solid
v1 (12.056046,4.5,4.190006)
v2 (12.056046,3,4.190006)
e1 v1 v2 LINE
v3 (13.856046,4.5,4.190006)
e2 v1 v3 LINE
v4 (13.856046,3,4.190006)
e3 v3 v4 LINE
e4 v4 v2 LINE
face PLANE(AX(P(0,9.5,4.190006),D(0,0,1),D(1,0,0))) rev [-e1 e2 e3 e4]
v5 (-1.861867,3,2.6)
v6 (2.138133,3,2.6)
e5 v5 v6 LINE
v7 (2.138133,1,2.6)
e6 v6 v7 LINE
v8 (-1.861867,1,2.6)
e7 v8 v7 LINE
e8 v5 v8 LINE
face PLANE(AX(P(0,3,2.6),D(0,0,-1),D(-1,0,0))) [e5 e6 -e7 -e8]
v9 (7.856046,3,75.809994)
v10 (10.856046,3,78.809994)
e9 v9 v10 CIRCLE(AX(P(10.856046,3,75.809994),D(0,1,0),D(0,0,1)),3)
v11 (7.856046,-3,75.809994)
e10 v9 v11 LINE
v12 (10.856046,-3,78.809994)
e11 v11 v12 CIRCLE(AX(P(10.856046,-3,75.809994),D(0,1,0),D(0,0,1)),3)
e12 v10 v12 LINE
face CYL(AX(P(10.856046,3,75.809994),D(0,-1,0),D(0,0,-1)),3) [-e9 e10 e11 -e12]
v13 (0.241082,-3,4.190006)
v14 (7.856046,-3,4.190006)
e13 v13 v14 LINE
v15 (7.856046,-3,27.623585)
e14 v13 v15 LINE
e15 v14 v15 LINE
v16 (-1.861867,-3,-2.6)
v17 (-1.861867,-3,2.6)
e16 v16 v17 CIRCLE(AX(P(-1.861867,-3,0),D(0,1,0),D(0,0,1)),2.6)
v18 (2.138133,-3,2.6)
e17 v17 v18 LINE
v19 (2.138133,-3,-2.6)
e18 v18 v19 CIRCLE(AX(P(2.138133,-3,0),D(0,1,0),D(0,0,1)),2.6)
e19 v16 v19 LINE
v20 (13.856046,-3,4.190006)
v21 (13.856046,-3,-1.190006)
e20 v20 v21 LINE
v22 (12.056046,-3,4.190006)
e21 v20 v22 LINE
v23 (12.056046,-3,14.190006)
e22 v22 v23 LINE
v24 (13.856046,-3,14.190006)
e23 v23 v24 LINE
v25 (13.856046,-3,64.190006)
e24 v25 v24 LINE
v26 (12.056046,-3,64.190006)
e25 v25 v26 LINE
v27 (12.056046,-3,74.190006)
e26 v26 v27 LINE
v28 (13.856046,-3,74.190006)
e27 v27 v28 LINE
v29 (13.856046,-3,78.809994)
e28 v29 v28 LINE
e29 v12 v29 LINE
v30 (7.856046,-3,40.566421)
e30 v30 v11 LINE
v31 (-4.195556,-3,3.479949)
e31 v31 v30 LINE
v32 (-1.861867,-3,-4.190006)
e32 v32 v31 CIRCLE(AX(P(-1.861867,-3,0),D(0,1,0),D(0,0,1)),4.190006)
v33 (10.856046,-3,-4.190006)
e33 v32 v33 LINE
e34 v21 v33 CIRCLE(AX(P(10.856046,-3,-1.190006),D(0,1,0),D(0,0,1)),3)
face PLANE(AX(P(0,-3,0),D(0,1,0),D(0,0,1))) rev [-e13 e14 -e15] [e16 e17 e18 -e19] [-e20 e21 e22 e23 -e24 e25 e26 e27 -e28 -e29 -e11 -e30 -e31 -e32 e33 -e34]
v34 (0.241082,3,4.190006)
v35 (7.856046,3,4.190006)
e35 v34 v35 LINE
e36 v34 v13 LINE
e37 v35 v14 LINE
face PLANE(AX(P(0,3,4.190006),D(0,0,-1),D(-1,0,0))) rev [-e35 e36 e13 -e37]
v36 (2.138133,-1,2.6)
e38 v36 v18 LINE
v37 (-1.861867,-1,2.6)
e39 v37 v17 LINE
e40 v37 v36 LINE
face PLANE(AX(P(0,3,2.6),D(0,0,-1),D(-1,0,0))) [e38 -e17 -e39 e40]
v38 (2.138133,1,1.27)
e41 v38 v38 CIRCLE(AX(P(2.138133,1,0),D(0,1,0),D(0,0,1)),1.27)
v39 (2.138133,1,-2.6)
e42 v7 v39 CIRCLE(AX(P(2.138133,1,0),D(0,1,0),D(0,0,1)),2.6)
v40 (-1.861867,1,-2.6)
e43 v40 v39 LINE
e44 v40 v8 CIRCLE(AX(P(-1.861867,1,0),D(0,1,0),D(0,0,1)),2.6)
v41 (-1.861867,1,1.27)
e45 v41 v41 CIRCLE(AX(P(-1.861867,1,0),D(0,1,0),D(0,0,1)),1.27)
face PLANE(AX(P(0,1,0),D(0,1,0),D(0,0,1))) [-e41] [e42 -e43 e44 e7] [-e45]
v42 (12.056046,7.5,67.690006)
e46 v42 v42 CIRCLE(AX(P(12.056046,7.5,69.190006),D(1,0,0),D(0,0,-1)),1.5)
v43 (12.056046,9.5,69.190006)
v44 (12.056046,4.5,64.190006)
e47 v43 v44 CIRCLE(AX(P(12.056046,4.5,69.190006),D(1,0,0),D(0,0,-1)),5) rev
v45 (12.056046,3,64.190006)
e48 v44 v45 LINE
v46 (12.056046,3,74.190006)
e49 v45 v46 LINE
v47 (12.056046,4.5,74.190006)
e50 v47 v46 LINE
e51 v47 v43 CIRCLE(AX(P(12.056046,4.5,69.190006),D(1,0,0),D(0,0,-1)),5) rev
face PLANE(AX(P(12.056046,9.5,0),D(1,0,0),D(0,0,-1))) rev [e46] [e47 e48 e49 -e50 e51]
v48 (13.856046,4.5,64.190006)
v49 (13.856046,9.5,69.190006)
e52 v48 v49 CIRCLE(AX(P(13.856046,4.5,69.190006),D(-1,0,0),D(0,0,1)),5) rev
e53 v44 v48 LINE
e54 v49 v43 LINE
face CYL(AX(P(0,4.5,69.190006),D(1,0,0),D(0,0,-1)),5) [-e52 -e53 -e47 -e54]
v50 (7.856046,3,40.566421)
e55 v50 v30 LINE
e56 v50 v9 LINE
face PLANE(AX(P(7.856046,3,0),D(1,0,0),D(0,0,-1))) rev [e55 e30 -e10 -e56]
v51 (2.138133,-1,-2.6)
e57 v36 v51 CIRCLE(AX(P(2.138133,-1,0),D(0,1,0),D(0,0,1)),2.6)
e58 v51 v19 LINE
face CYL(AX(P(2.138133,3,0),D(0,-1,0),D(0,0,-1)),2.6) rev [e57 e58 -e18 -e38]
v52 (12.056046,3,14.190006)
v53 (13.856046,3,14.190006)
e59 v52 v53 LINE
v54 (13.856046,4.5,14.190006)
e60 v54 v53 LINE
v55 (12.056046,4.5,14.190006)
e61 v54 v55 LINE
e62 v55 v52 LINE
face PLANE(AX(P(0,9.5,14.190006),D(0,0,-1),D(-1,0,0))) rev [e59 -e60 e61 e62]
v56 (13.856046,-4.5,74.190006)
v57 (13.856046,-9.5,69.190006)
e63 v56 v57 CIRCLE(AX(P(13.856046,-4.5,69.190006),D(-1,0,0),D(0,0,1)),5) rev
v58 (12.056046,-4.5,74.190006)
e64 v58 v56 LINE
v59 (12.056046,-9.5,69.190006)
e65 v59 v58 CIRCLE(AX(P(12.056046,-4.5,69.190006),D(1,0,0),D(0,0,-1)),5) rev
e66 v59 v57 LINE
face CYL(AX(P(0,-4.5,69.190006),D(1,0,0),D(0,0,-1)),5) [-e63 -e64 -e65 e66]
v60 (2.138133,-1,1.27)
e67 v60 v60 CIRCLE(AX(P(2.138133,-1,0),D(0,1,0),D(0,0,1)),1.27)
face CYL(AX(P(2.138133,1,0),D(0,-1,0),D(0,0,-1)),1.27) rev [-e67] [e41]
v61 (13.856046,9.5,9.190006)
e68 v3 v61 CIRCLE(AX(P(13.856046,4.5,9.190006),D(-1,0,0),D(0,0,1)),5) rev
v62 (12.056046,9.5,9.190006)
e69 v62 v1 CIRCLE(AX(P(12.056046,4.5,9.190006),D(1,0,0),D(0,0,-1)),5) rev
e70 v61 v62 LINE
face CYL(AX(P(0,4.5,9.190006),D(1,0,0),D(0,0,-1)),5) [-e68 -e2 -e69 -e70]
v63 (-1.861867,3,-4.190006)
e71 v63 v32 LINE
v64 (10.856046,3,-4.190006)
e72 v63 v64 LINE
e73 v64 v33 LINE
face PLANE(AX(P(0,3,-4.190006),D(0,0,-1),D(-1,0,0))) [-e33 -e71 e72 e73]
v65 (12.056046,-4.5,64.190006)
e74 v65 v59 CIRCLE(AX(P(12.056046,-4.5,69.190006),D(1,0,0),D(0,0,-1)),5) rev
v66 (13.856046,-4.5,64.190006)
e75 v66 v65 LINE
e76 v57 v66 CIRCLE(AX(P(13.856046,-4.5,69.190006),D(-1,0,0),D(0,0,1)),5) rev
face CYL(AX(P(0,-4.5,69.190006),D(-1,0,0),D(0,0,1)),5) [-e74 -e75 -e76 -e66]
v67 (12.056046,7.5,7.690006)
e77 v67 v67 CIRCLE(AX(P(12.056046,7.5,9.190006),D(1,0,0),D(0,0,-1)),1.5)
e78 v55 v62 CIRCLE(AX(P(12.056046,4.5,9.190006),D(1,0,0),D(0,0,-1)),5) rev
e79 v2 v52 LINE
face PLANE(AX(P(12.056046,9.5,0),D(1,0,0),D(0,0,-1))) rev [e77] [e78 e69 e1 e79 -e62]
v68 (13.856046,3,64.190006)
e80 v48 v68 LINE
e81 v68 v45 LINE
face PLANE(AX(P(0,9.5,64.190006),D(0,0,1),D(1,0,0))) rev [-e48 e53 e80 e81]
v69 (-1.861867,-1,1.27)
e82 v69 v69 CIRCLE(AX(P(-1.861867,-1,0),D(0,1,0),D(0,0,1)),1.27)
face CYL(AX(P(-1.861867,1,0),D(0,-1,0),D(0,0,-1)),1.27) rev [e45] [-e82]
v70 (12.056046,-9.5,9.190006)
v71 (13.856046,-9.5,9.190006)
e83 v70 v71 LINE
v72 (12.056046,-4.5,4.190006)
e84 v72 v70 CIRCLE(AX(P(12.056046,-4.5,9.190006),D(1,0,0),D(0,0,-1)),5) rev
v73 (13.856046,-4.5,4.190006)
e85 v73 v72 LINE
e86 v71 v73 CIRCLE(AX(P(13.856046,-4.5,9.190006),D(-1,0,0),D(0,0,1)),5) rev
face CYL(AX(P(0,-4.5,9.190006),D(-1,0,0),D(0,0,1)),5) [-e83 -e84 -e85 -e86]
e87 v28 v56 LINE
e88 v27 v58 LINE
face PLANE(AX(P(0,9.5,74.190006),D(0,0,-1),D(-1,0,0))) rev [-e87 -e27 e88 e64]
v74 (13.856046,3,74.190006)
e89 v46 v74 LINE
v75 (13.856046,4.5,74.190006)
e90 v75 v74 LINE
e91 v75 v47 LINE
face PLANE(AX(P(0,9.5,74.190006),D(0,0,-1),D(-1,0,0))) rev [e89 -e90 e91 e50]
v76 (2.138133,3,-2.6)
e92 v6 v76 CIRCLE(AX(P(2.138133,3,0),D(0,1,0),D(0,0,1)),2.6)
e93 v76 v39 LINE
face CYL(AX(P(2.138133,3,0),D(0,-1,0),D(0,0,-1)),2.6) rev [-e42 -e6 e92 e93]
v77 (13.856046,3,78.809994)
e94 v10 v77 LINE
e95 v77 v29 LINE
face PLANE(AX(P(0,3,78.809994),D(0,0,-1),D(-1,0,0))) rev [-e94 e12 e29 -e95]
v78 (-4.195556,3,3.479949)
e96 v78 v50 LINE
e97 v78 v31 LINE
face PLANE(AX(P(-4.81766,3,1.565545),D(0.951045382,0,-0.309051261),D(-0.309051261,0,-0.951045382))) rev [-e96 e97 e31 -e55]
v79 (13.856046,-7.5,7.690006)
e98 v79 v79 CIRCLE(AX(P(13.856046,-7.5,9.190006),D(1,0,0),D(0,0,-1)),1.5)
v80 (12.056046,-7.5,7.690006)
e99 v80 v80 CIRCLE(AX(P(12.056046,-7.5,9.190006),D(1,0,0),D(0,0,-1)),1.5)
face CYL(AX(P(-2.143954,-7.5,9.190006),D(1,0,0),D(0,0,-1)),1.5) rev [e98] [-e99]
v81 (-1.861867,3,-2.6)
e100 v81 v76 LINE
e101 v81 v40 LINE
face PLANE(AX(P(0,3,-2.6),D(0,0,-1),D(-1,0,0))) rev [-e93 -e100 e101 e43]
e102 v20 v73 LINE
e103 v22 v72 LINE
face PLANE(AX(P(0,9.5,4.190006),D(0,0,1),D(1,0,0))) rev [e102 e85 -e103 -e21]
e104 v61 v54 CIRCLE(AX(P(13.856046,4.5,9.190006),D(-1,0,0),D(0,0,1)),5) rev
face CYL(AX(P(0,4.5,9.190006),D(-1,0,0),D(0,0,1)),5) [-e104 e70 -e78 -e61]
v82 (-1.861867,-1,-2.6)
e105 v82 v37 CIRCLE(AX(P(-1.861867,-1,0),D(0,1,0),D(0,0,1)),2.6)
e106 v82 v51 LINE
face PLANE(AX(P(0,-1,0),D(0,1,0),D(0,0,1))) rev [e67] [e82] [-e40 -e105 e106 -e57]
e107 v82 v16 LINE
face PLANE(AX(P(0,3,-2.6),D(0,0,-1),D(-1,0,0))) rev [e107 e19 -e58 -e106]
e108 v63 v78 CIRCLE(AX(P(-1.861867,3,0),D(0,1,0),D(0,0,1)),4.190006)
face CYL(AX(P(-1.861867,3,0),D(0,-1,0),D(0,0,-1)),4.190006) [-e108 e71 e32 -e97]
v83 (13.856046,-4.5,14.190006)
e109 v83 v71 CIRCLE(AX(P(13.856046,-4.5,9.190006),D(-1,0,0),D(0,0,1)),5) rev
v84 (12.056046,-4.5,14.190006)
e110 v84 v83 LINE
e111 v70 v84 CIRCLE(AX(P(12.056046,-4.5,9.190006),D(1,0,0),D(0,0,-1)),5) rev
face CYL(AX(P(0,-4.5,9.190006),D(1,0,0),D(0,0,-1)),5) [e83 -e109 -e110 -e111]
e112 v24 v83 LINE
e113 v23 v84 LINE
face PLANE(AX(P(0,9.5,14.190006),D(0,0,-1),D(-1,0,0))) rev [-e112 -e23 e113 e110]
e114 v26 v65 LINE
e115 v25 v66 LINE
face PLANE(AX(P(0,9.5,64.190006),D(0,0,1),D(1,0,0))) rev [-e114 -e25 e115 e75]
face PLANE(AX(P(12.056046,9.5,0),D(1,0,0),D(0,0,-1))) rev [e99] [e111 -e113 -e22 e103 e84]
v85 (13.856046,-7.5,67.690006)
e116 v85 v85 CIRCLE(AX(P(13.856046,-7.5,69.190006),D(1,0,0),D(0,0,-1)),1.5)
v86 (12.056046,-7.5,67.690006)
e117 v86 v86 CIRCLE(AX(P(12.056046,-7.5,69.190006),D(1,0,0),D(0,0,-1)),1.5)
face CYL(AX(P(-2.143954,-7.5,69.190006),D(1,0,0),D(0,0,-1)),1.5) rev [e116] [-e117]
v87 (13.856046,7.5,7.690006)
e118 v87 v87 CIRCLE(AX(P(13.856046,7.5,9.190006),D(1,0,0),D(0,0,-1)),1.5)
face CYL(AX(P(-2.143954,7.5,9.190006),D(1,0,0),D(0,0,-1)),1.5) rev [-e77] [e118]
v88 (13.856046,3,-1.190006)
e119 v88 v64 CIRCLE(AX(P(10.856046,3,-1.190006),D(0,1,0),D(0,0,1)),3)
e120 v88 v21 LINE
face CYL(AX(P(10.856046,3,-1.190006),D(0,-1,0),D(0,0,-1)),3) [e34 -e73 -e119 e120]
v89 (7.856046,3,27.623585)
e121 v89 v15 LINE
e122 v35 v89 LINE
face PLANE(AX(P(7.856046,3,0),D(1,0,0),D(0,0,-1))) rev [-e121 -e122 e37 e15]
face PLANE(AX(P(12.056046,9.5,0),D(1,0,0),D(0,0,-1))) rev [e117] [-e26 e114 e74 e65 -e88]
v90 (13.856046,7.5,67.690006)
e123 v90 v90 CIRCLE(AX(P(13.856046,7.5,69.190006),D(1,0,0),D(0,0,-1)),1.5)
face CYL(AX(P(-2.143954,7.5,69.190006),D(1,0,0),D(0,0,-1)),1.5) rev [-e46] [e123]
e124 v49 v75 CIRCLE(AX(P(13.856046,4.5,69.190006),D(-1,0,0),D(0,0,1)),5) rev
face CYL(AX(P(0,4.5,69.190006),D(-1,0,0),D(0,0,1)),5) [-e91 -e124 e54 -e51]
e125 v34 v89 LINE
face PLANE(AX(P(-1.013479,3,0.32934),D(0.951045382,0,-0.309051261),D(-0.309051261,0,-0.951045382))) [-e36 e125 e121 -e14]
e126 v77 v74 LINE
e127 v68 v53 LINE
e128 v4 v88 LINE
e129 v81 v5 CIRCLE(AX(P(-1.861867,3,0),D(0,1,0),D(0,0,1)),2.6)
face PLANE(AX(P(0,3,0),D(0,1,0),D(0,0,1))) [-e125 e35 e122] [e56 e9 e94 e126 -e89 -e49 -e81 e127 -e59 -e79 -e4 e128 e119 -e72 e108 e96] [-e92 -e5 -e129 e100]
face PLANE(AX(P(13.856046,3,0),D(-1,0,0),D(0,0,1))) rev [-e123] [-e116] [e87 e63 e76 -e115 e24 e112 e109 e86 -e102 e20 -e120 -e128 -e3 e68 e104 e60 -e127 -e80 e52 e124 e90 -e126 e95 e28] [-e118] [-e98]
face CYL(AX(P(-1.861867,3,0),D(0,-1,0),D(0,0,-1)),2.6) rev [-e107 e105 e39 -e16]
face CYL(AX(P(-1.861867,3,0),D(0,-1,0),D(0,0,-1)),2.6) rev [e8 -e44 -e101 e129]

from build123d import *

# Parameters (mm, degrees)
SALIENTE_EXTRUIR1_DEPTH = 3
SALIENTE_EXTRUIR2_DEPTH = 1
CROQUIS1_7_W            = 1.8
CROQUIS1_7_H            = 10
SALIENTE_EXTRUIR4_DEPTH = 9.5
REDONDEO2_R             = 5
CROQUIS3_R              = 1.5
CORTAR_EXTRUIR2_DEPTH   = 16


with BuildPart() as part:
    # Croquis1 → Saliente-Extruir1 (new, symmetric)
    with BuildSketch(Plane(origin=(0, 0, 0), x_dir=(1, 0, 0), z_dir=(0, 1, 0))):
        with BuildLine():
            Line((-1.861867424, 4.190006044), (10.856046359, 4.190006044))
            ThreePointArc((10.856046359, 4.190006044), (12.977366702, 3.311326387), (13.856046359, 1.190006044))
            Line((13.856046359, 1.190006044), (13.856046359, -78.809993956))
            Line((13.856046359, -78.809993956), (10.856046359, -78.809993956))
            ThreePointArc((10.856046359, -78.809993956), (8.734726015, -77.9313143), (7.856046359, -75.809993956))
            Line((7.856046359, -75.809993956), (7.856046359, -40.566421369))
            Line((7.856046359, -40.566421369), (-4.195556186, -3.47994934))
            ThreePointArc((-4.195556186, -3.47994934), (-5.870430721, 1.219660174), (-1.861867424, 4.190006044))
        make_face()
        with BuildLine():
            Line((-1.861867424, 2.6), (2.138132576, 2.6))
            ThreePointArc((2.138132576, 2.6), (4.738132576, 0), (2.138132576, -2.6))
            Line((2.138132576, -2.6), (-1.861867424, -2.6))
            ThreePointArc((-1.861867424, -2.6), (-4.461867424, 0), (-1.861867424, 2.6))
        make_face(mode=Mode.SUBTRACT)
        Polygon((0.241081645, -4.190006044), (7.856046359, -4.190006044), (7.856046359, -27.623584675), align=None, mode=Mode.SUBTRACT)
    extrude(amount=SALIENTE_EXTRUIR1_DEPTH, both=True)

    # Croquis1<3> → Saliente-Extruir2 (add, symmetric)
    with BuildSketch(Plane(origin=(0, 0, 0), x_dir=(1, 0, 0), z_dir=(0, 1, 0))):
        with BuildLine():
            ThreePointArc((-1.861867424, 2.6), (-3.700345055, 1.838477631), (-4.461867424, 0))
            ThreePointArc((-4.461867424, 0), (-3.700345055, -1.838477631), (-1.861867424, -2.6))
            Line((-1.861867424, -2.6), (2.138132576, -2.6))
            ThreePointArc((2.138132576, -2.6), (4.738132576, 0), (2.138132576, 2.6))
            Line((2.138132576, 2.6), (-1.861867424, 2.6))
        make_face()
        with BuildLine():
            ThreePointArc((-0.591867424, 0), (-1.861867424, -1.27), (-3.131867424, 0))
            ThreePointArc((-3.131867424, 0), (-1.861867424, 1.27), (-0.591867424, 0))
        make_face(mode=Mode.SUBTRACT)
        with BuildLine():
            ThreePointArc((3.408132576, 0), (2.138132576, -1.27), (0.868132576, 0))
            ThreePointArc((0.868132576, 0), (2.138132576, 1.27), (3.408132576, 0))
        make_face(mode=Mode.SUBTRACT)
    extrude(amount=SALIENTE_EXTRUIR2_DEPTH, both=True)

    # Croquis1<7> → Saliente-Extruir4 (add, symmetric)
    with BuildSketch(Plane(origin=(0, 0, 0), x_dir=(1, 0, 0), z_dir=(0, 1, 0))):
        with Locations((12.956046359, -9.190006044)):
            Rectangle(CROQUIS1_7_W, CROQUIS1_7_H)
        with Locations((12.956046359, -69.190006044)):
            Rectangle(CROQUIS1_7_W, CROQUIS1_7_H)
    extrude(amount=SALIENTE_EXTRUIR4_DEPTH, both=True)

    # Redondeo2
    # the kernel refuses this fillet: 5 mm, written as the material it takes off along each edge
    with BuildSketch(Plane(origin=(-0.443953641, -9.5, 74.190006044), x_dir=(0, 1, 0), z_dir=(1, 0, 0)), Plane(origin=(26.356046359, -9.5, 64.190006044), x_dir=(0, 1, 0), z_dir=(-1, 0, 0)), Plane(origin=(-0.443953641, -9.5, 14.190006044), x_dir=(0, 1, 0), z_dir=(1, 0, 0)), Plane(origin=(26.356046359, -9.5, 4.190006044), x_dir=(0, 1, 0), z_dir=(-1, 0, 0))) as redondeo2_piece_1:
        with BuildLine():
            CenterArc((REDONDEO2_R, -REDONDEO2_R), REDONDEO2_R, 90, 90)
            Line((0, -REDONDEO2_R), (-REDONDEO2_R * 0.02, -REDONDEO2_R))
            Line((-REDONDEO2_R * 0.02, -REDONDEO2_R), (-REDONDEO2_R * 0.02, REDONDEO2_R * 0.02))
            Line((-REDONDEO2_R * 0.02, REDONDEO2_R * 0.02), (REDONDEO2_R, REDONDEO2_R * 0.02))
            Line((REDONDEO2_R, REDONDEO2_R * 0.02), (REDONDEO2_R, 0))
        make_face()
    extrude(amount=26.8, mode=Mode.SUBTRACT)
    with BuildSketch(Plane(origin=(-0.443953641, 9.5, 74.190006044), x_dir=(0, -1, 0), z_dir=(1, 0, 0)), Plane(origin=(26.356046359, 9.5, 64.190006044), x_dir=(0, -1, 0), z_dir=(-1, 0, 0)), Plane(origin=(-0.443953641, 9.5, 14.190006044), x_dir=(0, -1, 0), z_dir=(1, 0, 0)), Plane(origin=(26.356046359, 9.5, 4.190006044), x_dir=(0, -1, 0), z_dir=(-1, 0, 0))) as redondeo2_piece_2:
        with BuildLine():
            CenterArc((REDONDEO2_R, REDONDEO2_R), REDONDEO2_R, 180, 90)
            Line((0, REDONDEO2_R), (-REDONDEO2_R * 0.02, REDONDEO2_R))
            Line((-REDONDEO2_R * 0.02, REDONDEO2_R), (-REDONDEO2_R * 0.02, -REDONDEO2_R * 0.02))
            Line((-REDONDEO2_R * 0.02, -REDONDEO2_R * 0.02), (REDONDEO2_R, -REDONDEO2_R * 0.02))
            Line((REDONDEO2_R, -REDONDEO2_R * 0.02), (REDONDEO2_R, 0))
        make_face()
    extrude(amount=26.8, mode=Mode.SUBTRACT)

    # Croquis3 → Cortar-Extruir2 (cut)
    with BuildSketch(Plane(origin=(13.856046359, 0, 0), x_dir=(0, 0, -1), z_dir=(1, 0, 0))):
        with Locations((-69.190006044, 7.5)):
            Circle(CROQUIS3_R)
        with Locations((-69.190006044, -7.5)):
            Circle(CROQUIS3_R)
        with Locations((-9.190006044, 7.5)):
            Circle(CROQUIS3_R)
        with Locations((-9.190006044, -7.5)):
            Circle(CROQUIS3_R)
    extrude(amount=-CORTAR_EXTRUIR2_DEPTH, mode=Mode.SUBTRACT)


solid = part.part
